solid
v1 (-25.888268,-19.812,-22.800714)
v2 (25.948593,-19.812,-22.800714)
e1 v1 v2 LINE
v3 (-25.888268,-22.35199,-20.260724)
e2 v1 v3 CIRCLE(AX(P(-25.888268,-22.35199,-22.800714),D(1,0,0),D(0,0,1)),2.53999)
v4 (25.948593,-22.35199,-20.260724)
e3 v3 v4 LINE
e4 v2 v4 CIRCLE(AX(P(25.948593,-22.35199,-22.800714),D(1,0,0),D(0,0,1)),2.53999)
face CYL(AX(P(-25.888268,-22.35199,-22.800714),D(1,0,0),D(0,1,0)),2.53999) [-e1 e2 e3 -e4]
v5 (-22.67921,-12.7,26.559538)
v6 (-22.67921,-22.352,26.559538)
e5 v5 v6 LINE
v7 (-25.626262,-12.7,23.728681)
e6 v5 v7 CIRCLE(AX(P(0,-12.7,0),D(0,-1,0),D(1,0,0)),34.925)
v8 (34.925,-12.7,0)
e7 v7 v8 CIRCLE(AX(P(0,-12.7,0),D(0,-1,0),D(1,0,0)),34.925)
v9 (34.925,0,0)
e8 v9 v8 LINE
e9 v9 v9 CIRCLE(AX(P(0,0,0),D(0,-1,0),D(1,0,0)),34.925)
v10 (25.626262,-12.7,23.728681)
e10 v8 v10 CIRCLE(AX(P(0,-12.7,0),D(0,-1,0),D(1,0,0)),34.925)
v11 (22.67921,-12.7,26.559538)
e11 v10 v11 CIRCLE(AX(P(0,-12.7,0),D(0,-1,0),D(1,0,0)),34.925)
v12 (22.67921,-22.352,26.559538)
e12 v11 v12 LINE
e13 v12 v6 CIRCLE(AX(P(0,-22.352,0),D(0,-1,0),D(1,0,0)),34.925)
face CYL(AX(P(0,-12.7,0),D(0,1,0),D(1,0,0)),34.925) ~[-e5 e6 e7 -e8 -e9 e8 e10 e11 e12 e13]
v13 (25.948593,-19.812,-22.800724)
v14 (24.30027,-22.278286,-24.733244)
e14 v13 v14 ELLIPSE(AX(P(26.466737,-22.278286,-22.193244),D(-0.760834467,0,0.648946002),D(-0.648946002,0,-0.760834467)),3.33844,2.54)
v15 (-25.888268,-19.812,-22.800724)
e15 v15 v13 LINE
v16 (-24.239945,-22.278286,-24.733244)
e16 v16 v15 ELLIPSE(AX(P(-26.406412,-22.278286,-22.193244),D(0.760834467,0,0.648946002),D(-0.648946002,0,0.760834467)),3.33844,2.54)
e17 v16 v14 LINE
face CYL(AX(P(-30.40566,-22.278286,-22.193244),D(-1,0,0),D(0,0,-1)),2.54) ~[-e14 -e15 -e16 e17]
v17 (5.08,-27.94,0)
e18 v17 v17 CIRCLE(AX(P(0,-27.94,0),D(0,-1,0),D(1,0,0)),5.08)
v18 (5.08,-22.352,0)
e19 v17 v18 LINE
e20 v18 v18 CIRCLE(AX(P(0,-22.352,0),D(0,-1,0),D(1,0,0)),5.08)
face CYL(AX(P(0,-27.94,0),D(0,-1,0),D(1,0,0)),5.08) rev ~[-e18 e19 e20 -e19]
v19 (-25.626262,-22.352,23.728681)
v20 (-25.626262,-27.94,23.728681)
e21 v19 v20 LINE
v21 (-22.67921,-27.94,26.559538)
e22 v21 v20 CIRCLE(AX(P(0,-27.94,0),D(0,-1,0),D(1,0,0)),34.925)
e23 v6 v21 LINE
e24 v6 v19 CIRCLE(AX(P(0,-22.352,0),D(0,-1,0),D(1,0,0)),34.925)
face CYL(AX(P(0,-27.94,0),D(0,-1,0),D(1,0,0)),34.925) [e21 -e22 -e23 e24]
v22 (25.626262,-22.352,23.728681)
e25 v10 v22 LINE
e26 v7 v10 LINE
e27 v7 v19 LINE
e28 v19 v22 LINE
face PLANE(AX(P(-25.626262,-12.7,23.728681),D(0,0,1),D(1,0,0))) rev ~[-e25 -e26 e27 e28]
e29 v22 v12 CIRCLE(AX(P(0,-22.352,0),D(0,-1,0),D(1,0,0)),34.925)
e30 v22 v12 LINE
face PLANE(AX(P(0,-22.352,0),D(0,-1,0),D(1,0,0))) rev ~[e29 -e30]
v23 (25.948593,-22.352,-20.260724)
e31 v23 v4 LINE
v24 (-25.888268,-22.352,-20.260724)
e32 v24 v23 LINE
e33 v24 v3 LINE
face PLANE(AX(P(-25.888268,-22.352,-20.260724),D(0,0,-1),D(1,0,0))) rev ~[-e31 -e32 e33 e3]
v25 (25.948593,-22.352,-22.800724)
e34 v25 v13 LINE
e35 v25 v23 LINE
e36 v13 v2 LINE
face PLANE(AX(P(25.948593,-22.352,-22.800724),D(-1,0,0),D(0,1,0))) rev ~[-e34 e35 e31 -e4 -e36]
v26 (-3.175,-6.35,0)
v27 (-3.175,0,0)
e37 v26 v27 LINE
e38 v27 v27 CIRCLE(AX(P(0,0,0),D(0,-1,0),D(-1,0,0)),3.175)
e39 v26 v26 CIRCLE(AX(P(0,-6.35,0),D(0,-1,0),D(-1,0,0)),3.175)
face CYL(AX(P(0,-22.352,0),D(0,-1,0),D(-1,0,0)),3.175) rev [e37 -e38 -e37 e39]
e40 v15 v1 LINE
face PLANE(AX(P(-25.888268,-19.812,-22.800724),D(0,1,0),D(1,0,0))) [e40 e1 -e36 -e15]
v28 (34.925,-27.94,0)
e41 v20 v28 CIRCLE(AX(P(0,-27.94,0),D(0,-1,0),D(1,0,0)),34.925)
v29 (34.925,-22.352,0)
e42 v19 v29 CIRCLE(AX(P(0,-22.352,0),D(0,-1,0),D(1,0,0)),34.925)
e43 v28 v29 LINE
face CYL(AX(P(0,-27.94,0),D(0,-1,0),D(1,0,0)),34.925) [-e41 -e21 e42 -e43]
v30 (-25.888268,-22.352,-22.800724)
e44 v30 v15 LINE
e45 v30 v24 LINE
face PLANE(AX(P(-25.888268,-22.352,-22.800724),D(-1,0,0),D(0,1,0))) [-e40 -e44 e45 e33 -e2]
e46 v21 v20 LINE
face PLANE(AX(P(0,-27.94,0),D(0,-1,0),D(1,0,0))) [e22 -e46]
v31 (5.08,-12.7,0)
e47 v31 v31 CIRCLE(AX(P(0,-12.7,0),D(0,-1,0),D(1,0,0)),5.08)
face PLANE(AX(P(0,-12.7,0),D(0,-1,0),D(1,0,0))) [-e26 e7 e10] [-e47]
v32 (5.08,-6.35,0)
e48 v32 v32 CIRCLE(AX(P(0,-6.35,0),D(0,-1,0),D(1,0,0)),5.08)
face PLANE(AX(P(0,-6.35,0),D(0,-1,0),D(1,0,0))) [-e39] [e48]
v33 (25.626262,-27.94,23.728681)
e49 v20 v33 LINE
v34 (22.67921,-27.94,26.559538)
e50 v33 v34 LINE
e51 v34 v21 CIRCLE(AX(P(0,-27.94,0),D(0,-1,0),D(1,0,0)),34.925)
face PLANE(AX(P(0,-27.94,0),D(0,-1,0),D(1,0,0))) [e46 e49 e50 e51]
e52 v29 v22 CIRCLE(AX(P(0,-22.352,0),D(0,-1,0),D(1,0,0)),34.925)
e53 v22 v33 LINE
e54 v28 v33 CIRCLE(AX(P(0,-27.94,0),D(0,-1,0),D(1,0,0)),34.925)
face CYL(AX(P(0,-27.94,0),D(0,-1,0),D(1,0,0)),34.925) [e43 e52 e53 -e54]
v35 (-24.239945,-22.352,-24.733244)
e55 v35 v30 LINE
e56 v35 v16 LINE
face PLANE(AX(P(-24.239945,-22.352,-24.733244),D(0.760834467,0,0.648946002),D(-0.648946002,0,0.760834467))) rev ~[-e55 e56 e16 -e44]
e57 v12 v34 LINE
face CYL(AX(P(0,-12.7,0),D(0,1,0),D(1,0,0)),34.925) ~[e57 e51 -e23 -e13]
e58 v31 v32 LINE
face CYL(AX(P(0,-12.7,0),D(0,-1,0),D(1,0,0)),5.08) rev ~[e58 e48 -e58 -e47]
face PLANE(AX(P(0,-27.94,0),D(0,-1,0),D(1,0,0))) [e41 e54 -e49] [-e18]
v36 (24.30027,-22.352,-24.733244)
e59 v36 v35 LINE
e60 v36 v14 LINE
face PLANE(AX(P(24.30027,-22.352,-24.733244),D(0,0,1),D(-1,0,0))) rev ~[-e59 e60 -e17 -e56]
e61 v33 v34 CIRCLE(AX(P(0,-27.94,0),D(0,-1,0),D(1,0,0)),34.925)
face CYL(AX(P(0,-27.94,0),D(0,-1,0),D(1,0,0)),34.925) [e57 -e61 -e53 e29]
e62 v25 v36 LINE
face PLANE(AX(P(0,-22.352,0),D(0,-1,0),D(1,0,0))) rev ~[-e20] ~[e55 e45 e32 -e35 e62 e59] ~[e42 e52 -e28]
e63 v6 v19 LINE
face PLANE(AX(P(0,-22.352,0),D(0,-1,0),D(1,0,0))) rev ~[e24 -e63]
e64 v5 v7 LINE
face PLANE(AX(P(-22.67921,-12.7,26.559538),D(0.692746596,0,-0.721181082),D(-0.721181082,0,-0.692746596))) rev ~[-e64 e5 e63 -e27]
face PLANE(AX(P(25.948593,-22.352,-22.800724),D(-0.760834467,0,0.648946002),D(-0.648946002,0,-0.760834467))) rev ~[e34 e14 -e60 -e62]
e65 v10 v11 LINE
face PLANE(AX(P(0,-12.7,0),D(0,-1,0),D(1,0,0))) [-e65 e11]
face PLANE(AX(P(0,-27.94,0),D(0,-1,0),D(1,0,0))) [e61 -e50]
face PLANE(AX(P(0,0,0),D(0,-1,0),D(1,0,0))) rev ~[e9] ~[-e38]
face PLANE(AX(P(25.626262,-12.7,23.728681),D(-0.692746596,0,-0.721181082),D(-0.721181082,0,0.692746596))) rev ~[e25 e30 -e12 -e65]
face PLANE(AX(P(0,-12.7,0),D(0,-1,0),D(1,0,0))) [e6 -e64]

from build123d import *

# Parameters (mm, degrees)
F0_R         = 34.925
F1_DEPTH     = 12.7
F2_R         = 5.08
F3_DEPTH     = 6.35
F5_DEPTH     = 15.24
F6_DEPTH     = 15.24
F7_R         = 34.925
F8_DEPTH     = 5.588
F9_R         = 5.08
F10_DEPTH    = 6.35
F13_DEPTH    = 2.54
F14_T1_DEPTH = 60.8716457984
F15_DEPTH    = 2.54
F16_R        = 2.53999
F17_R        = 3.175
F18_DEPTH    = 25.4


# Not quite as in the source:
# - a fillet or chamfer that OpenCascade refuses, or shapes differently, is made with other operations: its cross-section is extruded or revolved along the edge and cut away or added
# - a fillet or chamfer is up to 0.001 mm smaller than in the source, because OpenCascade refuses the exact size


with BuildPart() as f1:
    # F0 (on Front) → F1 (new body)
    with BuildSketch(Plane.XZ):
        Circle(F0_R)
    extrude(amount=F1_DEPTH)

    # F2 (on face) → F3 (cut)
    with BuildSketch(Plane.XZ.offset(12.7)):
        Circle(F2_R)
    extrude(amount=-F3_DEPTH, mode=Mode.SUBTRACT)

    # F4 (on face) → F5 (join)
    with BuildSketch(Plane.XZ.offset(12.7)):
        Polygon((22.6792097043, 26.5595382526), (-22.6792097043, 26.5595382526), (-25.6262624144, 23.7286809509), (25.6262624144, 23.7286809509), align=None)
    extrude(amount=F5_DEPTH)

    # F6 (add): a face of the model
    f6_faces = [f1.faces().sort_by_distance(p)[0] for p in [
        (0, -12.7, 29.942642138),
    ]]
    extrude(f6_faces, amount=F6_DEPTH)

    # F7 (on face) → F8 (join)
    with BuildSketch(Plane.XZ.offset(27.94)):
        Circle(F7_R)
    extrude(amount=-F8_DEPTH)

    # F9 (on face) → F10 (cut)
    with BuildSketch(Plane.XZ.offset(27.94)):
        Circle(F9_R)
    extrude(amount=-F10_DEPTH, mode=Mode.SUBTRACT)

    # F12 (on face) → F13 (join)
    with BuildSketch(Plane(origin=(0, -22.352, 0), x_dir=(-1, 0, 0), z_dir=(0, 1, 0))):
        Polygon((-25.9485930492, -22.8007244613), (-24.3002702047, -24.7332440084), (24.2399447162, -24.7332440084), (25.8882675608, -22.8007244613), align=None)
    extrude(amount=F13_DEPTH)

    # F14: fillet of radius 2.54 on 1 edges, made by hand

    # F14_s2 → F14_t1 (cut)
    with BuildSketch(Plane.YZ.offset(-30.405660155)):
        with BuildLine():
            ThreePointArc((-22.2782861755, -24.7332440084), (-20.7116656647, -24.1925689383), (-19.812, -22.8007244613))
            Line((-19.812, -22.8007244613), (-19.812, -24.7332440084))
            Line((-19.812, -24.7332440084), (-22.2782861755, -24.7332440084))
        make_face()
    extrude(amount=F14_T1_DEPTH, mode=Mode.SUBTRACT)

    # F15 (add): a face of the model
    f15_faces = [f1.faces().sort_by_distance(p)[0] for p in [
        (0.0301627442, -21.082, -22.8007244613),
    ]]
    extrude(f15_faces, amount=F15_DEPTH)

    # F16 (radius 2.54 in the source; OpenCascade refuses exactly that, so slightly less here)
    f16_edges = [f1.edges().sort_by_distance(p)[0] for p in [
        (0.030163, -19.812, -20.260724),
    ]]
    fillet(f16_edges, radius=F16_R)

    # F17 (on face) → F18 (cut)
    with BuildSketch(Plane(origin=(0, -22.352, 0), x_dir=(-1, 0, 0), z_dir=(0, 1, 0))):
        Circle(F17_R)
    extrude(amount=F18_DEPTH, mode=Mode.SUBTRACT)


solid = f1.part
